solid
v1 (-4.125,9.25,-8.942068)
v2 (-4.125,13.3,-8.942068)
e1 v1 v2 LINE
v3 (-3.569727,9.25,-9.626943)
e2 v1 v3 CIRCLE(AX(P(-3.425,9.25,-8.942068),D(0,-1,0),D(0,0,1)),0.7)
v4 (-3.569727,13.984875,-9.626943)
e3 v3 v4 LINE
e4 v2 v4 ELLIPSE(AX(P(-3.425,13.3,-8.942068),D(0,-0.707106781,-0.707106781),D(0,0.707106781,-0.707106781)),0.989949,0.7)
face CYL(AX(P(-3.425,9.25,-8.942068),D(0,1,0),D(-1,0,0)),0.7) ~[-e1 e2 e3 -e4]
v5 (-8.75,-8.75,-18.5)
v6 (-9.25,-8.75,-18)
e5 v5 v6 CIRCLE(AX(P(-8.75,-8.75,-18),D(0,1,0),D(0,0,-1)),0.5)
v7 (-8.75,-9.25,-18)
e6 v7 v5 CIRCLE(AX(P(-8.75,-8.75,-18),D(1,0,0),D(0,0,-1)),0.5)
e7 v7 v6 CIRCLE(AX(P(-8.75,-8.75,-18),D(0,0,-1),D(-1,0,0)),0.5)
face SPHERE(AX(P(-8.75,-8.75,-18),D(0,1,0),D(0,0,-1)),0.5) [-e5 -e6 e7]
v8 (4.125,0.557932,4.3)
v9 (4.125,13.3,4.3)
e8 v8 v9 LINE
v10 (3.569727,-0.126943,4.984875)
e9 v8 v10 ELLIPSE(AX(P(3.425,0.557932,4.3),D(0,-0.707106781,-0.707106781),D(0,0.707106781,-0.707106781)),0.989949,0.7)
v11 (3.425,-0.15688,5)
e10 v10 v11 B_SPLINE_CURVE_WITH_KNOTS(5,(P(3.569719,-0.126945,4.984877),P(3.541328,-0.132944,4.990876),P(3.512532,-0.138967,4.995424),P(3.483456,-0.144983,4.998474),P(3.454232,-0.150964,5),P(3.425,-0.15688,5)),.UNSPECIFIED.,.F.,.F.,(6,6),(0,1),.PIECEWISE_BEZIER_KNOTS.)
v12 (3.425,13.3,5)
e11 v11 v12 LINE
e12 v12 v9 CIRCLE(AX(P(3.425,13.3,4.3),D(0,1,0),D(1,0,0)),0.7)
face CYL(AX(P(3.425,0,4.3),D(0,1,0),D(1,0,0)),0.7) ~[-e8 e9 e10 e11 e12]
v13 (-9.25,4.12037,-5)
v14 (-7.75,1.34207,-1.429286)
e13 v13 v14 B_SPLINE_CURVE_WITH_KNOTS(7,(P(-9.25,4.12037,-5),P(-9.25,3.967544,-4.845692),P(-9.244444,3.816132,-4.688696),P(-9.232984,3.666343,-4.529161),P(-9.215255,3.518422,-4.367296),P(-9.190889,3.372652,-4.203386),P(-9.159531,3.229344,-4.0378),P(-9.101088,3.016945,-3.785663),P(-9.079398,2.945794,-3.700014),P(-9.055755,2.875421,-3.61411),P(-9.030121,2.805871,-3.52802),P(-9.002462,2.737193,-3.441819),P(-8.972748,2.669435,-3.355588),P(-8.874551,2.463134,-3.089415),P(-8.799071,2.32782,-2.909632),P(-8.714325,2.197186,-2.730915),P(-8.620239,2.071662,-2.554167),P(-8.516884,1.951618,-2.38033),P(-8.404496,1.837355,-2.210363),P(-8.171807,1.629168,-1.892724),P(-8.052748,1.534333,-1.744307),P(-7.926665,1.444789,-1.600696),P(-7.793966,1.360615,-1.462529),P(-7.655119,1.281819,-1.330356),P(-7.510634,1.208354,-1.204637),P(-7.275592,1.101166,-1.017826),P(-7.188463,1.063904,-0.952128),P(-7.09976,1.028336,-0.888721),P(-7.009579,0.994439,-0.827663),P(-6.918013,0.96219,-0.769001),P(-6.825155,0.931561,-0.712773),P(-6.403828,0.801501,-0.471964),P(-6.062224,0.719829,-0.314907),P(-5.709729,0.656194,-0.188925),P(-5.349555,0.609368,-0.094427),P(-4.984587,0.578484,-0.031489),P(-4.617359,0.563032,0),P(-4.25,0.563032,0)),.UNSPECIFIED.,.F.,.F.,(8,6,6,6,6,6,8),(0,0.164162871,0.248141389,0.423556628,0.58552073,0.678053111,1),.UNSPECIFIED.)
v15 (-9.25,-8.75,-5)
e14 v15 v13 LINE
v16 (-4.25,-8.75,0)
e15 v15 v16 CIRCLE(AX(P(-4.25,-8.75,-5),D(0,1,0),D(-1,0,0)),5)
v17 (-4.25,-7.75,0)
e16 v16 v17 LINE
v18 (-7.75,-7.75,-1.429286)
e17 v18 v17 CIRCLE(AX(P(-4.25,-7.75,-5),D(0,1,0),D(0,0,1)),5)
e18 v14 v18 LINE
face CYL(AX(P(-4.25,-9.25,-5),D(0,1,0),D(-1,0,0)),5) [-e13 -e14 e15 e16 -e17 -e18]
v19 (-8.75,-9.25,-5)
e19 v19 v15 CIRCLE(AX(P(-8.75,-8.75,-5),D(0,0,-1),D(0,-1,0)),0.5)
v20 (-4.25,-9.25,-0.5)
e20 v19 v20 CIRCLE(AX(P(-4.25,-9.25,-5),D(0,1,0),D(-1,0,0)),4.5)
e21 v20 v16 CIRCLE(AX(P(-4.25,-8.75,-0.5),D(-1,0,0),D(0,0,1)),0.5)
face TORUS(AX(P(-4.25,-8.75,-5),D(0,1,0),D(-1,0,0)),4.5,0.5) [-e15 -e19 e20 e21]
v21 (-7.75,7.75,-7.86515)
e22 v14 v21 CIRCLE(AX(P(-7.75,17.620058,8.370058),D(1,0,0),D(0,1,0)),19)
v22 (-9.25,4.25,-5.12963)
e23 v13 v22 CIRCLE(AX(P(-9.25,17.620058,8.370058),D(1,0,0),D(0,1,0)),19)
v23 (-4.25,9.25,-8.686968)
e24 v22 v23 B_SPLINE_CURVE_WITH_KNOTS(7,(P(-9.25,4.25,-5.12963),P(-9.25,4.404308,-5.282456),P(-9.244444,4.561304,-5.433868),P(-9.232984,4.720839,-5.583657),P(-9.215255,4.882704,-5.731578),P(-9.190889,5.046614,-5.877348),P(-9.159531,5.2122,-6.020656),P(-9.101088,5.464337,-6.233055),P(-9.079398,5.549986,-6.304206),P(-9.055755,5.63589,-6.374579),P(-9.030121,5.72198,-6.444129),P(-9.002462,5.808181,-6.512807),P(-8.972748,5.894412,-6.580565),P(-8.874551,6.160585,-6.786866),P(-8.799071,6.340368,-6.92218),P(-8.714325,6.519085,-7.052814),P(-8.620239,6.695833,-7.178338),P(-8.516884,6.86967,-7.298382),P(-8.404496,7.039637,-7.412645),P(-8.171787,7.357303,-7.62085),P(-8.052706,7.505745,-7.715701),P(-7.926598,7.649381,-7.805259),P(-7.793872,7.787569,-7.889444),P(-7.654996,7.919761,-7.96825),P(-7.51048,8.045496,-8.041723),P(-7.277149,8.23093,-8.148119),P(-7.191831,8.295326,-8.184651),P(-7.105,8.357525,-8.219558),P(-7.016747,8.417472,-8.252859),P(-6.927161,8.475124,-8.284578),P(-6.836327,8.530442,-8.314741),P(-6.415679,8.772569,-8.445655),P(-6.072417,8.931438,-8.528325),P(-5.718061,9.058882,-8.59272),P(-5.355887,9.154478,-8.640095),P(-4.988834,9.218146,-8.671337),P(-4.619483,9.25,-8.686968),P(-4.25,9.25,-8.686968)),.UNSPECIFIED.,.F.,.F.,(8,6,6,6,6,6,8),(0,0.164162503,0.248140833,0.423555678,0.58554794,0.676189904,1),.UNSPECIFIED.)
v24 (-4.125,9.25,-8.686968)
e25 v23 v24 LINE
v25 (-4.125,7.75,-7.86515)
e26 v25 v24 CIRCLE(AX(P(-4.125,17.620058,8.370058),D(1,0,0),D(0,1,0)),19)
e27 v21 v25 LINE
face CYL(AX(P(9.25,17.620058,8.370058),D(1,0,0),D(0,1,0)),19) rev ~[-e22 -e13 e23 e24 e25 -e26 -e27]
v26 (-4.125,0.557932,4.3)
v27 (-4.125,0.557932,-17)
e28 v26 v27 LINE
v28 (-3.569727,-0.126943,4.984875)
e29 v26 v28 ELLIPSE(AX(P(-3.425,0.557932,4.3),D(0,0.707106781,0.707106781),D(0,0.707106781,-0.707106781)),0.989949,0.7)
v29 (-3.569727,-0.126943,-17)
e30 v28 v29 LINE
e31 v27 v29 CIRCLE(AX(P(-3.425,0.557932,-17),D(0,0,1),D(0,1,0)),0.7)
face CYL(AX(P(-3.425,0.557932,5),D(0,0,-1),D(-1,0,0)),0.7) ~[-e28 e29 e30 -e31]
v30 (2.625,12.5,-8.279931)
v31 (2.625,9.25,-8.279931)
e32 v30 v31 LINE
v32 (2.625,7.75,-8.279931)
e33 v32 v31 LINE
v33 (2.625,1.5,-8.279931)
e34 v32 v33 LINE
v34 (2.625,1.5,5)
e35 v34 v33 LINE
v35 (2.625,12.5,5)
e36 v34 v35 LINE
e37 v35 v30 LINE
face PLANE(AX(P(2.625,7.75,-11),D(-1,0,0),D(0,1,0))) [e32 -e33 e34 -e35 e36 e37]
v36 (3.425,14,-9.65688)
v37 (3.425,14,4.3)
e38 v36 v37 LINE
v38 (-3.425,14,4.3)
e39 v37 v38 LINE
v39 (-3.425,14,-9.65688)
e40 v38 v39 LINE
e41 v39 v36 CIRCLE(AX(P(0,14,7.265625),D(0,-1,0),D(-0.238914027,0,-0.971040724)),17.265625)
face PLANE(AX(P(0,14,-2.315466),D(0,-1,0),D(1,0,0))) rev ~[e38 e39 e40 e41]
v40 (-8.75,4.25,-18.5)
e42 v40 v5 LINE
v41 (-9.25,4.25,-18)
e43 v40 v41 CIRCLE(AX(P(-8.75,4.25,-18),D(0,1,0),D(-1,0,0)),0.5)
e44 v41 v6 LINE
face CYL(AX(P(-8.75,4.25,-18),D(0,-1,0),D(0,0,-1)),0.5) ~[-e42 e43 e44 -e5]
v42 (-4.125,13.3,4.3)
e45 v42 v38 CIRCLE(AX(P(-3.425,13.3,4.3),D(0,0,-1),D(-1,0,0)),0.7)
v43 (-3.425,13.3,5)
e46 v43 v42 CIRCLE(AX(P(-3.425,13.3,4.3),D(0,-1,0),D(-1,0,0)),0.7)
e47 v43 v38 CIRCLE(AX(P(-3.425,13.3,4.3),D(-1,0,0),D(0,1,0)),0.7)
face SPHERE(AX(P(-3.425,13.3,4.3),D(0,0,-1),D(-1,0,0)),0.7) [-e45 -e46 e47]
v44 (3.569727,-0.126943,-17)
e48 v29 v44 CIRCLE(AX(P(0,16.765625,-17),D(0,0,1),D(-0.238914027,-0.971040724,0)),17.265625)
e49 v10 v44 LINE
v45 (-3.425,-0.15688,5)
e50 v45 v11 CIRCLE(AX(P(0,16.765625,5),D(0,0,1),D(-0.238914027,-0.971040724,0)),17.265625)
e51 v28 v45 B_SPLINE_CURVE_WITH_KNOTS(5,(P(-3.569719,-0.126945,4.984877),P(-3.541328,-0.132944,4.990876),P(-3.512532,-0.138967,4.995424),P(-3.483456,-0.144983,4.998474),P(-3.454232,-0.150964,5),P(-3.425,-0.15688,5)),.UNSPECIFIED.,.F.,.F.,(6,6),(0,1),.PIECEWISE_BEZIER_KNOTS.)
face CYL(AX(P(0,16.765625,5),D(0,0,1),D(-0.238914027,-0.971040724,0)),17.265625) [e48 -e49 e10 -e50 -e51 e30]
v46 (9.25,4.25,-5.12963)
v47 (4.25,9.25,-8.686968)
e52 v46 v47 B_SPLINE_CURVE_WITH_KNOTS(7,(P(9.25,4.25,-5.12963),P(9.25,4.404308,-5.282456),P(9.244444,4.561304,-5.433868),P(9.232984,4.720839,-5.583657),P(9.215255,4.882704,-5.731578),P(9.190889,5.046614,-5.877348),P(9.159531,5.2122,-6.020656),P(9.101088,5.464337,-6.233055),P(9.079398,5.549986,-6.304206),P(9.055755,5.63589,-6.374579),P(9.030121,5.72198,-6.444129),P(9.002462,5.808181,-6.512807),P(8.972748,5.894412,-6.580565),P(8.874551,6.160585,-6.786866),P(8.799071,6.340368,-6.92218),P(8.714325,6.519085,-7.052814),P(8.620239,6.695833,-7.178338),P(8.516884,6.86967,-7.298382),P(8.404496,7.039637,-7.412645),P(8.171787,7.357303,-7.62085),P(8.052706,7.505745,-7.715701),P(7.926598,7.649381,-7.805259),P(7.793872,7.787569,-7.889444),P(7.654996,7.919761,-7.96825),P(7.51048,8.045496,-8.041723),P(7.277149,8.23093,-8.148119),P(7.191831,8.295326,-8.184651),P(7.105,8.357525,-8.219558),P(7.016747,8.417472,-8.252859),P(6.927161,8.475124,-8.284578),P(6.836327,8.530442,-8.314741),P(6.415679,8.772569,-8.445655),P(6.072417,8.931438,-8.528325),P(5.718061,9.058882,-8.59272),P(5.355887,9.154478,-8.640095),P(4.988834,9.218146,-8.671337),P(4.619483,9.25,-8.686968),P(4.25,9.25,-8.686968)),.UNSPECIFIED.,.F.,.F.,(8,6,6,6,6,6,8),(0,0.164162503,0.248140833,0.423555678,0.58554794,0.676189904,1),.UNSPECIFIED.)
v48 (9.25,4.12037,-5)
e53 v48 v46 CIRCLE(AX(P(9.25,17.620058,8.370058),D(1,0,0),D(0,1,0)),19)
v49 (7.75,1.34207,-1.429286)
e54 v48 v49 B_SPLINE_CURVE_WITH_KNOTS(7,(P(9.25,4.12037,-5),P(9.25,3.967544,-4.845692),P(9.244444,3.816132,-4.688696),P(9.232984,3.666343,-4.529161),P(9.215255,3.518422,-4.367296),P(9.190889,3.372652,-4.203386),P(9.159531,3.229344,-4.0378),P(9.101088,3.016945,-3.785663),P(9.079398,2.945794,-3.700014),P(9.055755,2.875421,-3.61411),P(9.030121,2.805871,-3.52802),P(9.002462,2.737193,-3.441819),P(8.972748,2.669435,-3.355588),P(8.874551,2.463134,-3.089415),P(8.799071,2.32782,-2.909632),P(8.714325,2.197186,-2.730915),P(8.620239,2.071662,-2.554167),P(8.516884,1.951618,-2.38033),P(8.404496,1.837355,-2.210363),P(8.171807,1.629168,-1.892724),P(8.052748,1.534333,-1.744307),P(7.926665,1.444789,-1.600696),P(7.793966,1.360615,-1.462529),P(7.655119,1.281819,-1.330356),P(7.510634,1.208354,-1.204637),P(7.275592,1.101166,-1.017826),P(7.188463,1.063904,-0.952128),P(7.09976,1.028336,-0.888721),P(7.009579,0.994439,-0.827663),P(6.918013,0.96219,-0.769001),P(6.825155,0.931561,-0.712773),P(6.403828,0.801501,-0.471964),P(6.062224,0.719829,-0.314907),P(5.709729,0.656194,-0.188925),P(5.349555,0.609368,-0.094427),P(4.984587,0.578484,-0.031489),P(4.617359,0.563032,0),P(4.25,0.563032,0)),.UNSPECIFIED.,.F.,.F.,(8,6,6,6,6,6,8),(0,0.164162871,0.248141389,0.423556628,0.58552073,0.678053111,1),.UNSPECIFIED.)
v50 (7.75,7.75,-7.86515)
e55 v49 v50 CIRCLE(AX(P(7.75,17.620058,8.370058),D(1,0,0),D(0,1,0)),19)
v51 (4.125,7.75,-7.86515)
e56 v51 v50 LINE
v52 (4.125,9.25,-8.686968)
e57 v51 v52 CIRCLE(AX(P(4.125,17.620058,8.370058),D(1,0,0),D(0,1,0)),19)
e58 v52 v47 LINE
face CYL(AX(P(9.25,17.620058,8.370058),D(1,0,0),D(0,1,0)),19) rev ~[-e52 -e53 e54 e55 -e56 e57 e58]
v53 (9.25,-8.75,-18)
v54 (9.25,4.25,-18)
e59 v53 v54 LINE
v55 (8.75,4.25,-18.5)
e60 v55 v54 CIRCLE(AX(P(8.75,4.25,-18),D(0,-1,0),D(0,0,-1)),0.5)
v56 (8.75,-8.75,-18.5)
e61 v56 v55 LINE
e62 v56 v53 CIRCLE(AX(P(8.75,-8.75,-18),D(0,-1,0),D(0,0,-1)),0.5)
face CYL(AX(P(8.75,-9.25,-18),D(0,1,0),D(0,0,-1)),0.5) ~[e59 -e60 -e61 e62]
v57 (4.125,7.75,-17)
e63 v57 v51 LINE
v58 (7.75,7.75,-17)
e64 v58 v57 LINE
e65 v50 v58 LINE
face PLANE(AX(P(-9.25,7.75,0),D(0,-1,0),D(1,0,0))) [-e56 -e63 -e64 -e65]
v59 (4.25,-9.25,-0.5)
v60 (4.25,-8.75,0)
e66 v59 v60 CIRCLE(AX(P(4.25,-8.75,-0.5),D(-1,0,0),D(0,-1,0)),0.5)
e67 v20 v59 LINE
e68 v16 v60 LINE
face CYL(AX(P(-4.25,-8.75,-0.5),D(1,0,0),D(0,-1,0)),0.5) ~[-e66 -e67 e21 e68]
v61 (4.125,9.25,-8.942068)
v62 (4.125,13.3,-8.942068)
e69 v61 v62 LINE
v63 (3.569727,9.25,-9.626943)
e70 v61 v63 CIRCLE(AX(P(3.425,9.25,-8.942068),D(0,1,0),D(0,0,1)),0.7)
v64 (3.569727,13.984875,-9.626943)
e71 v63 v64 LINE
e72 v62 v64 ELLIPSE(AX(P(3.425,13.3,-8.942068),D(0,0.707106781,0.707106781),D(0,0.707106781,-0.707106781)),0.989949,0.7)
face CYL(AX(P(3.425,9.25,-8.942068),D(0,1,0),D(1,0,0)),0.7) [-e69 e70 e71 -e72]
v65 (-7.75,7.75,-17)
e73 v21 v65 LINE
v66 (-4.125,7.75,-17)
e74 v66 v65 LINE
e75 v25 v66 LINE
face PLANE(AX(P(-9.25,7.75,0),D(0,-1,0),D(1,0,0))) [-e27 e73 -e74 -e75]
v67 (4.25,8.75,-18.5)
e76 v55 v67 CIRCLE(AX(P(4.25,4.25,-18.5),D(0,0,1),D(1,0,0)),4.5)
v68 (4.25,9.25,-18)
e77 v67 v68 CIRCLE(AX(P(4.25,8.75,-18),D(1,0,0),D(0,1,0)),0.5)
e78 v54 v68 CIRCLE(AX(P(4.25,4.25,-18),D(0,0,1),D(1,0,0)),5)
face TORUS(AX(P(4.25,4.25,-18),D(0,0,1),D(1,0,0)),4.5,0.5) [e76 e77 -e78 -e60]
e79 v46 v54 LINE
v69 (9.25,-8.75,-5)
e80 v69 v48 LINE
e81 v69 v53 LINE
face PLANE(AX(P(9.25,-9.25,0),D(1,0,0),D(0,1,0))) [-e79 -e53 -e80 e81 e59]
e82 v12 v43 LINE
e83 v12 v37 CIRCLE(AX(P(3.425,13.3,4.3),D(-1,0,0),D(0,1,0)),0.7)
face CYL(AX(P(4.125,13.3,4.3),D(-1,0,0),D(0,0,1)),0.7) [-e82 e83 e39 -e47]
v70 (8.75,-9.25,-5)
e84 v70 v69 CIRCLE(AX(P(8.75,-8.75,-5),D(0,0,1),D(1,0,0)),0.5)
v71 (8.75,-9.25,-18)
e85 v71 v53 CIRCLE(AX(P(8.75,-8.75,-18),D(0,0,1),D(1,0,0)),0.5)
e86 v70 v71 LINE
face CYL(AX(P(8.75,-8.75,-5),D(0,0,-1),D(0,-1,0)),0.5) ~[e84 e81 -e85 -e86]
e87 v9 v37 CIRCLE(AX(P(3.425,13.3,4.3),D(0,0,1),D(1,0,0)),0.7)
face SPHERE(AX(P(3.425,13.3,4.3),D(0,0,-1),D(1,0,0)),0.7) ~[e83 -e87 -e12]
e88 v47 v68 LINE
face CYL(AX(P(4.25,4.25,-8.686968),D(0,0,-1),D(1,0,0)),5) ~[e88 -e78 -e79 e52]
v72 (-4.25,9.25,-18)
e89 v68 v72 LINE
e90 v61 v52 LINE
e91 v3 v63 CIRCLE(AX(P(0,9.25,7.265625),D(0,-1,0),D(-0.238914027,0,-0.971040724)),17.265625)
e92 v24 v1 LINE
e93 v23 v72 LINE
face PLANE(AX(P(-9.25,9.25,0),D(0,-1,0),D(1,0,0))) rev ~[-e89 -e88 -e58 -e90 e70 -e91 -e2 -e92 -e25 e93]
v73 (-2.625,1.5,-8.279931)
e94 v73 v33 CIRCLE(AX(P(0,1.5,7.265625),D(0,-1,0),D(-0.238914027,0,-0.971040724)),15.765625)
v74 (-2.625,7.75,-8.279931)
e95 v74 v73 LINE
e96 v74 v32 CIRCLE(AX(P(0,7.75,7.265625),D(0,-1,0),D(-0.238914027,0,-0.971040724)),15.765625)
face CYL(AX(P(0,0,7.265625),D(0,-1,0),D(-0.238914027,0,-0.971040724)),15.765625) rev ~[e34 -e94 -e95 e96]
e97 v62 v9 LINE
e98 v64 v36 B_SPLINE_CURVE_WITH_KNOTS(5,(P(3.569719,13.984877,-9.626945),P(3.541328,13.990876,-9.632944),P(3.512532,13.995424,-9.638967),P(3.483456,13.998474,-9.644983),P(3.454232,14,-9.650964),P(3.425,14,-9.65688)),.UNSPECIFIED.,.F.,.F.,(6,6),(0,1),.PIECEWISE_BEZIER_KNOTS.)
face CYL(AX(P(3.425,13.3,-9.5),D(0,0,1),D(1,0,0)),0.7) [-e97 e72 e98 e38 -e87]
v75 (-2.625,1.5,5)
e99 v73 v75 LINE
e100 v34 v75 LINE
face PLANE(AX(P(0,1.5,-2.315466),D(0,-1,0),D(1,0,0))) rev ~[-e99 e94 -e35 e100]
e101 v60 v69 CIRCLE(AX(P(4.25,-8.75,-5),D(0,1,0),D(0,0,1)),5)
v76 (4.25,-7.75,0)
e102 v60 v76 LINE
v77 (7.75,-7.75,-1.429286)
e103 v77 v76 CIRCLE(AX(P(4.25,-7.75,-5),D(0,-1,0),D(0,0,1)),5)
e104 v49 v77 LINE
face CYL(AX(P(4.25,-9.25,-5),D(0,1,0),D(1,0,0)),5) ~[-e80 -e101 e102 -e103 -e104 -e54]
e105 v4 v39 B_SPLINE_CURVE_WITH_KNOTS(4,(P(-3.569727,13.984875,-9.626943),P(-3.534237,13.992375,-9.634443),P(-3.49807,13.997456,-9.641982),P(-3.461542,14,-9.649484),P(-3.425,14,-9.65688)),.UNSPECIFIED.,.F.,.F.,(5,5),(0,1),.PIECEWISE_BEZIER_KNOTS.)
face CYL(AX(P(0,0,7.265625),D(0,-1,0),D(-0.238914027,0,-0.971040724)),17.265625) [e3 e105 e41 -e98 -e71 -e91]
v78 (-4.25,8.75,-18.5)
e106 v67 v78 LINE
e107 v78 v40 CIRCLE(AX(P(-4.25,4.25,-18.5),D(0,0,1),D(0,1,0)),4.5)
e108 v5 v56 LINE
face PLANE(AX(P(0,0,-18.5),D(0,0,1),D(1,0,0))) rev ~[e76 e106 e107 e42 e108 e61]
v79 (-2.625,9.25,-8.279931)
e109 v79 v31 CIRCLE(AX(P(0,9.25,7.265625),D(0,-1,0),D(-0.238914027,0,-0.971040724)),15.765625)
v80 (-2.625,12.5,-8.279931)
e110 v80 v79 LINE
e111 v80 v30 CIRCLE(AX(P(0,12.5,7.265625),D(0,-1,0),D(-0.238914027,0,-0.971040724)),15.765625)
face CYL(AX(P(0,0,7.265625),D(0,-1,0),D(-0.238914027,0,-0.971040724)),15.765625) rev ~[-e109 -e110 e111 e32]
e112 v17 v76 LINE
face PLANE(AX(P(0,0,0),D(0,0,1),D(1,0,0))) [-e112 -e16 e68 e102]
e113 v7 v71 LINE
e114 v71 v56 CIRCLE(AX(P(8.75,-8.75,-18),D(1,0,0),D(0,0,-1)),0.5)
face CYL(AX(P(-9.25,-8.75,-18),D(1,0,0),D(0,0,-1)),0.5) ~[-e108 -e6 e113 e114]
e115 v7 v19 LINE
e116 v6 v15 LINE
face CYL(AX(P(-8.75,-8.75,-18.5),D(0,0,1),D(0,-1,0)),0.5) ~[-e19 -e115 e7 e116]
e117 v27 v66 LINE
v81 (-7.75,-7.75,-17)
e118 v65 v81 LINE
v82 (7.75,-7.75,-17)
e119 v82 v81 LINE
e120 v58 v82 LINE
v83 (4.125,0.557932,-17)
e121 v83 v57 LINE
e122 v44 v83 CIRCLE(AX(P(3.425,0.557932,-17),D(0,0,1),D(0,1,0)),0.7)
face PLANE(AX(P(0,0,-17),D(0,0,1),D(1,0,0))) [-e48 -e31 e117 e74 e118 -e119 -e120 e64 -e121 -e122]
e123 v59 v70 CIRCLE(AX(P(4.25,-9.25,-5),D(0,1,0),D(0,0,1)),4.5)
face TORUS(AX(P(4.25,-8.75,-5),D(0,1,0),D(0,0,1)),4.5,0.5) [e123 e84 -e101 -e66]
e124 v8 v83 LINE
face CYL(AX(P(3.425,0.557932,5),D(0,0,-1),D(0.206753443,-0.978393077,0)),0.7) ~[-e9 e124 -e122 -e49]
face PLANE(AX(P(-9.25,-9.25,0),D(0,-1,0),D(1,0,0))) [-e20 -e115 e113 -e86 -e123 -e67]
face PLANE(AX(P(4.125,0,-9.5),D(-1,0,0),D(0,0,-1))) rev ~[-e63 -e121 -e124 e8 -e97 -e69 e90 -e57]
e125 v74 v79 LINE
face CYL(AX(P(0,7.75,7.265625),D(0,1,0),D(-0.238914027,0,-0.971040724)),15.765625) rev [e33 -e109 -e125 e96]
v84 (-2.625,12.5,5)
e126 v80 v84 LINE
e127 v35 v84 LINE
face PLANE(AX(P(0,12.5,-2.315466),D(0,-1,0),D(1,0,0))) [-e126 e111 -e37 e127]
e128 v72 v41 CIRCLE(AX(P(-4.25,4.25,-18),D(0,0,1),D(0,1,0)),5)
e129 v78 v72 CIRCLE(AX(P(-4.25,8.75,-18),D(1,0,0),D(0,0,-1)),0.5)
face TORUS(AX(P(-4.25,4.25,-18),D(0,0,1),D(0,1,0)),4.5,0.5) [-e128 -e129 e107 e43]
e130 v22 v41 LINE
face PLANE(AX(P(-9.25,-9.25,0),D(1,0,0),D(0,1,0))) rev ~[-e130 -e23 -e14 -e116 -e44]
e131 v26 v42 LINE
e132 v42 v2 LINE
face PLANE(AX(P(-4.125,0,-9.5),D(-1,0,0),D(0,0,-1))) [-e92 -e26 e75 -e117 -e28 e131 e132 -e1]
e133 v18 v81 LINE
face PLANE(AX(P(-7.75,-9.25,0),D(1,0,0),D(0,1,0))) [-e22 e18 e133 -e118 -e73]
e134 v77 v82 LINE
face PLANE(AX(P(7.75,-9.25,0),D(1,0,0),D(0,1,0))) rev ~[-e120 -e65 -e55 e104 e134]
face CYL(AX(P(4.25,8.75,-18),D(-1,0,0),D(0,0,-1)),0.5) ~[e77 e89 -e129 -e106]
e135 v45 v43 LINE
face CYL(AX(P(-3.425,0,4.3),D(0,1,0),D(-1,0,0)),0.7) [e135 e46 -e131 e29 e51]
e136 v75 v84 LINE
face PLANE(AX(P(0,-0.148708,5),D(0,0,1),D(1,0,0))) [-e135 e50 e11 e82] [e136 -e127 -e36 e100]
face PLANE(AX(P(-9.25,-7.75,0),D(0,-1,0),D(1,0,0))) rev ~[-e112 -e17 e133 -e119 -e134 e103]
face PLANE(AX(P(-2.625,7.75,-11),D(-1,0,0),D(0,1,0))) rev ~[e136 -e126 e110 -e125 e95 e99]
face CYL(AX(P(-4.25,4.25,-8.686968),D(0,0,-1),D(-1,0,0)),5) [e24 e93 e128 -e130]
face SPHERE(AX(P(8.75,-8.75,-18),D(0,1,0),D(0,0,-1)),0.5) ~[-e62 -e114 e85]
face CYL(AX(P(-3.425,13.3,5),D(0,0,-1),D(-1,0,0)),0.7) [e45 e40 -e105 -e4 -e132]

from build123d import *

# Parameters (mm, degrees)
F0_W         = 18.5
F0_H         = 18.5
F1_DEPTH     = 18.5
F2_R         = 19
F3_DEPTH     = 25.4
F4_T         = -1.5
F6_DEPTH     = 14
F7_T         = 1.5
F7_T3_DEPTH  = 3.8130317325
F7_T5_DEPTH  = 20
F7_T7_DEPTH  = 18.5
F7_T9_DEPTH  = 12.1348502244
F7_T11_DEPTH = 18.5
F7_T13_DEPTH = 4.6348502244
F7_T16_ANGLE = 5.1594967302
F7_T18_ANGLE = 27.6449084771
F7_T20_ANGLE = 5.1594967302
F7_T22_ANGLE = 27.6449084771
F9_DEPTH     = 23.32034
F10_DEPTH    = 8.55107
F11_R        = 5
F12_R        = 0.7
F13_R        = 0.5


# Not quite as in the source:
# - a shell that OpenCascade refuses in one call is made with other operations: the cavity is built on its own and cut out


with BuildPart() as f1:
    # F0 (on Top) → F1 (new body)
    with BuildSketch(Plane.XY):
        Rectangle(F0_W, F0_H)
    extrude(amount=-F1_DEPTH)

    # F2 (on face) → F3 (cut)
    with BuildSketch(Plane.YZ.offset(9.25)):
        with Locations((17.6200576851, 8.3700576851)):
            Circle(F2_R)
    extrude(amount=-F3_DEPTH, mode=Mode.SUBTRACT)

    # F4
    f4_openings = [f1.faces().sort_by_distance(p)[0] for p in [
        (0, -4.343484, 0),
        (0, 4.185029, -5.064971),
    ]]
    offset(amount=F4_T, openings=f4_openings)

    # F5 (on Front) → F6 (join)
    with BuildSketch(Plane.XZ):
        with BuildLine():
            Line((4.125, -9.5), (4.125, 5))
            Line((4.125, 5), (0, 5))
            Line((0, 5), (-4.125, 5))
            Line((-4.125, 5), (-4.125, -9.5))
            ThreePointArc((-4.125, -9.5), (0, -10), (4.125, -9.5))
        make_face()
    extrude(amount=-F6_DEPTH)

    # F7: shell of thickness 1.5, made by hand


with BuildPart() as f7_core1:
    # F7_t2: copy of F1
    add(f1.part)

    # the walls: a layer under each face that stays
    f7_faces = [f7_core1.faces().sort_by_distance(p)[0] for p in [
        (9.25, 0, -9.25),
        (-7.9285714286, -8.549069162, 0),
        (8.3958333333, 1.5822898542, -1.8176801895),
        (0, 9.25, -13.5934841338),
        (0, 0, -18.5),
        (0, -9.25, -9.25),
        (-8.3958333333, 1.5822898542, -1.8176801895),
        (-9.25, 0, -9.25),
        (7.75, 0, -8.5),
        (0, -7.75, -8.5),
        (-7.75, 0, -8.5),
        (4.125, 7, -2.25),
        (0, 7.75, -12.4325748878),
        (0, 11.625, -10),
        (-4.125, 7, -2.25),
        (0, 0, -17),
        (0, 0, -2.5),
        (0, 14, -2.5),
        (0, 3.875, -10),
    ]]
    thicken(f7_faces, amount=-F7_T, mode=Mode.SUBTRACT)

    # F7_s4 → F7_t3 (cut)
    with BuildSketch(Plane.XY.offset(-11)):
        Polygon((4.14, 9.265), (4.125, 7.75), (2.625, 7.75), (2.625, 9.25), align=None)
        Polygon((-4.14, 9.265), (-4.125, 7.75), (-2.625, 7.75), (-2.625, 9.25), align=None)
    extrude(amount=F7_T3_DEPTH, mode=Mode.SUBTRACT)

    # F7_s6 → F7_t5 (cut)
    with BuildSketch(Plane.XY.offset(-18.5)):
        Polygon((7.735, -7.735), (9.25, -7.75), (9.25, -9.25), (7.75, -9.25), align=None)
        Polygon((-7.735, -7.735), (-7.75, -9.25), (-9.25, -9.25), (-9.25, -7.75), align=None)
    extrude(amount=F7_T5_DEPTH, mode=Mode.SUBTRACT)

    # F7_s8 → F7_t7 (cut)
    with BuildSketch(Plane.XZ.offset(-9.25)):
        Polygon((7.735, -16.985), (9.25, -17), (9.25, -18.5), (7.75, -18.5), align=None)
        Polygon((-7.735, -16.985), (-9.25, -17), (-9.25, -18.5), (-7.75, -18.5), align=None)
    extrude(amount=F7_T7_DEPTH, mode=Mode.SUBTRACT)

    # F7_s10 → F7_t9 (cut)
    with BuildSketch(Plane.XY.offset(-18.5)):
        Polygon((7.735, 7.735), (9.25, 7.75), (9.25, 9.25), (7.75, 9.25), align=None)
        Polygon((-7.735, 7.735), (-9.25, 7.75), (-9.25, 9.25), (-7.75, 9.25), align=None)
    extrude(amount=F7_T9_DEPTH, mode=Mode.SUBTRACT)

    # F7_s12 → F7_t11 (cut)
    with BuildSketch(Plane.YZ.offset(-9.25)):
        Polygon((-7.735, -16.985), (-9.25, -17), (-9.25, -18.5), (-7.75, -18.5), align=None)
        Polygon((7.735, -16.985), (9.25, -17), (9.25, -18.5), (7.75, -18.5), align=None)
    extrude(amount=F7_T11_DEPTH, mode=Mode.SUBTRACT)

    # F7_s14 → F7_t13 (cut)
    with BuildSketch(Plane.XY.offset(-11)):
        Polygon((4.14, 7.735), (2.625, 7.75), (2.625, 9.25), (4.125, 9.25), align=None)
        Polygon((-4.14, 7.735), (-4.125, 9.25), (-2.625, 9.25), (-2.625, 7.75), align=None)
    extrude(amount=F7_T13_DEPTH, mode=Mode.SUBTRACT)

    # F7_s15 → F7_t16 (revolve, cut)
    with BuildSketch(Plane(origin=(0, 9.1498364132, -5.5625660113), x_dir=(1, 0, 0), z_dir=(0, -0.8544846032, 0.5194767203))):
        Polygon((4.14, -2.679704803), (4.125, -4.194704803), (2.625, -4.194704803), (2.625, -2.694704803), align=None)
    revolve(axis=Axis((4.125, 17.6200576851, 8.3700576851), (1, 0, 0)), revolution_arc=F7_T16_ANGLE, mode=Mode.SUBTRACT)

    # F7_s17 → F7_t18 (revolve, cut)
    with BuildSketch(Plane(origin=(-1.6855904875, 0, 0.4147212383), x_dir=(0, 1, 0), z_dir=(-0.971040724, 0, 0.2389140271))):
        Polygon((9.265, 10.2254072398), (7.75, 10.2104072398), (7.75, 8.7104072398), (9.25, 8.7104072398), align=None)
    revolve(axis=Axis((0, 9.25, 7.265625), (0, -1, 0)), revolution_arc=F7_T18_ANGLE, mode=Mode.SUBTRACT)

    # F7_s19 → F7_t20 (revolve, cut)
    with BuildSketch(Plane(origin=(0, 9.1498364132, -5.5625660113), x_dir=(1, 0, 0), z_dir=(0, -0.8544846032, 0.5194767203))):
        Polygon((-4.14, -2.679704803), (-4.125, -4.194704803), (-2.625, -4.194704803), (-2.625, -2.694704803), align=None)
    revolve(axis=Axis((-4.125, 17.6200576851, 8.3700576851), (1, 0, 0)), revolution_arc=F7_T20_ANGLE, mode=Mode.SUBTRACT)

    # F7_s21 → F7_t22 (revolve, cut)
    with BuildSketch(Plane(origin=(-1.6855904875, 0, 0.4147212383), x_dir=(0, 1, 0), z_dir=(-0.971040724, 0, 0.2389140271))):
        Polygon((7.735, 10.2254072398), (9.25, 10.2104072398), (9.25, 8.7104072398), (7.75, 8.7104072398), align=None)
    revolve(axis=Axis((0, 7.75, 7.265625), (0, -1, 0)), revolution_arc=F7_T22_ANGLE, mode=Mode.SUBTRACT)


with BuildPart() as f1_1:
    add(f1.part)

    # what is left inside the walls is the cavity
    f7_cavity = [f7_core1.part.solids().sort_by_distance(p)[0] for p in [
        (-2.61, 7, 0.573356),
    ]]
    add(f7_cavity, mode=Mode.SUBTRACT)

    # F8 (on face) → F9 (join)
    with BuildSketch(Plane.XY.offset(5)):
        with BuildLine():
            Line((4.125, 0), (-4.125, 0))
            ThreePointArc((-4.125, 0), (0, -0.5), (4.125, 0))
        make_face()
    extrude(amount=-F9_DEPTH)

    # F10 (add): a face of the model
    f10_faces = [f1_1.faces().sort_by_distance(p)[0] for p in [
        (0, 0, -13.4156113664),
    ]]
    extrude(f10_faces, amount=F10_DEPTH)

    # F11
    f11_edges = [f1_1.edges().sort_by_distance(p)[0] for p in [
        (-9.25, -4.343484, 0),
        (9.25, -4.343484, 0),
        (9.25, 9.25, -13.593484),
        (-9.25, 9.25, -13.593484),
    ]]
    fillet(f11_edges, radius=F11_R)

    # F12
    f12_edges = [f1_1.edges().sort_by_distance(p)[0] for p in [
        (4.125, 14, -2.25),
        (-4.125, 14, -2.25),
        (4.125, 7, 5),
        (-4.125, 7, 5),
        (-4.125, 11.625, -9.5),
        (4.125, 11.625, -9.5),
        (4.125, 0, -6),
        (-4.125, 0, -6),
        (0, 14, 5),
    ]]
    fillet(f12_edges, radius=F12_R)

    # F13
    f13_edges = [f1_1.edges().sort_by_distance(p)[0] for p in [
        (9.25, -2.5, -18.5),
        (0, -9.25, -18.5),
        (9.25, -9.25, -11.75),
        (-9.25, -2.5, -18.5),
        (-9.25, -9.25, -11.75),
        (0, 9.25, -18.5),
        (7.785534, 7.785534, -18.5),
        (-7.785534, 7.785534, -18.5),
        (7.785534, -9.25, -1.464466),
        (-7.785534, -9.25, -1.464466),
        (0, -9.25, 0),
    ]]
    fillet(f13_edges, radius=F13_R)


solid = f1_1.part
